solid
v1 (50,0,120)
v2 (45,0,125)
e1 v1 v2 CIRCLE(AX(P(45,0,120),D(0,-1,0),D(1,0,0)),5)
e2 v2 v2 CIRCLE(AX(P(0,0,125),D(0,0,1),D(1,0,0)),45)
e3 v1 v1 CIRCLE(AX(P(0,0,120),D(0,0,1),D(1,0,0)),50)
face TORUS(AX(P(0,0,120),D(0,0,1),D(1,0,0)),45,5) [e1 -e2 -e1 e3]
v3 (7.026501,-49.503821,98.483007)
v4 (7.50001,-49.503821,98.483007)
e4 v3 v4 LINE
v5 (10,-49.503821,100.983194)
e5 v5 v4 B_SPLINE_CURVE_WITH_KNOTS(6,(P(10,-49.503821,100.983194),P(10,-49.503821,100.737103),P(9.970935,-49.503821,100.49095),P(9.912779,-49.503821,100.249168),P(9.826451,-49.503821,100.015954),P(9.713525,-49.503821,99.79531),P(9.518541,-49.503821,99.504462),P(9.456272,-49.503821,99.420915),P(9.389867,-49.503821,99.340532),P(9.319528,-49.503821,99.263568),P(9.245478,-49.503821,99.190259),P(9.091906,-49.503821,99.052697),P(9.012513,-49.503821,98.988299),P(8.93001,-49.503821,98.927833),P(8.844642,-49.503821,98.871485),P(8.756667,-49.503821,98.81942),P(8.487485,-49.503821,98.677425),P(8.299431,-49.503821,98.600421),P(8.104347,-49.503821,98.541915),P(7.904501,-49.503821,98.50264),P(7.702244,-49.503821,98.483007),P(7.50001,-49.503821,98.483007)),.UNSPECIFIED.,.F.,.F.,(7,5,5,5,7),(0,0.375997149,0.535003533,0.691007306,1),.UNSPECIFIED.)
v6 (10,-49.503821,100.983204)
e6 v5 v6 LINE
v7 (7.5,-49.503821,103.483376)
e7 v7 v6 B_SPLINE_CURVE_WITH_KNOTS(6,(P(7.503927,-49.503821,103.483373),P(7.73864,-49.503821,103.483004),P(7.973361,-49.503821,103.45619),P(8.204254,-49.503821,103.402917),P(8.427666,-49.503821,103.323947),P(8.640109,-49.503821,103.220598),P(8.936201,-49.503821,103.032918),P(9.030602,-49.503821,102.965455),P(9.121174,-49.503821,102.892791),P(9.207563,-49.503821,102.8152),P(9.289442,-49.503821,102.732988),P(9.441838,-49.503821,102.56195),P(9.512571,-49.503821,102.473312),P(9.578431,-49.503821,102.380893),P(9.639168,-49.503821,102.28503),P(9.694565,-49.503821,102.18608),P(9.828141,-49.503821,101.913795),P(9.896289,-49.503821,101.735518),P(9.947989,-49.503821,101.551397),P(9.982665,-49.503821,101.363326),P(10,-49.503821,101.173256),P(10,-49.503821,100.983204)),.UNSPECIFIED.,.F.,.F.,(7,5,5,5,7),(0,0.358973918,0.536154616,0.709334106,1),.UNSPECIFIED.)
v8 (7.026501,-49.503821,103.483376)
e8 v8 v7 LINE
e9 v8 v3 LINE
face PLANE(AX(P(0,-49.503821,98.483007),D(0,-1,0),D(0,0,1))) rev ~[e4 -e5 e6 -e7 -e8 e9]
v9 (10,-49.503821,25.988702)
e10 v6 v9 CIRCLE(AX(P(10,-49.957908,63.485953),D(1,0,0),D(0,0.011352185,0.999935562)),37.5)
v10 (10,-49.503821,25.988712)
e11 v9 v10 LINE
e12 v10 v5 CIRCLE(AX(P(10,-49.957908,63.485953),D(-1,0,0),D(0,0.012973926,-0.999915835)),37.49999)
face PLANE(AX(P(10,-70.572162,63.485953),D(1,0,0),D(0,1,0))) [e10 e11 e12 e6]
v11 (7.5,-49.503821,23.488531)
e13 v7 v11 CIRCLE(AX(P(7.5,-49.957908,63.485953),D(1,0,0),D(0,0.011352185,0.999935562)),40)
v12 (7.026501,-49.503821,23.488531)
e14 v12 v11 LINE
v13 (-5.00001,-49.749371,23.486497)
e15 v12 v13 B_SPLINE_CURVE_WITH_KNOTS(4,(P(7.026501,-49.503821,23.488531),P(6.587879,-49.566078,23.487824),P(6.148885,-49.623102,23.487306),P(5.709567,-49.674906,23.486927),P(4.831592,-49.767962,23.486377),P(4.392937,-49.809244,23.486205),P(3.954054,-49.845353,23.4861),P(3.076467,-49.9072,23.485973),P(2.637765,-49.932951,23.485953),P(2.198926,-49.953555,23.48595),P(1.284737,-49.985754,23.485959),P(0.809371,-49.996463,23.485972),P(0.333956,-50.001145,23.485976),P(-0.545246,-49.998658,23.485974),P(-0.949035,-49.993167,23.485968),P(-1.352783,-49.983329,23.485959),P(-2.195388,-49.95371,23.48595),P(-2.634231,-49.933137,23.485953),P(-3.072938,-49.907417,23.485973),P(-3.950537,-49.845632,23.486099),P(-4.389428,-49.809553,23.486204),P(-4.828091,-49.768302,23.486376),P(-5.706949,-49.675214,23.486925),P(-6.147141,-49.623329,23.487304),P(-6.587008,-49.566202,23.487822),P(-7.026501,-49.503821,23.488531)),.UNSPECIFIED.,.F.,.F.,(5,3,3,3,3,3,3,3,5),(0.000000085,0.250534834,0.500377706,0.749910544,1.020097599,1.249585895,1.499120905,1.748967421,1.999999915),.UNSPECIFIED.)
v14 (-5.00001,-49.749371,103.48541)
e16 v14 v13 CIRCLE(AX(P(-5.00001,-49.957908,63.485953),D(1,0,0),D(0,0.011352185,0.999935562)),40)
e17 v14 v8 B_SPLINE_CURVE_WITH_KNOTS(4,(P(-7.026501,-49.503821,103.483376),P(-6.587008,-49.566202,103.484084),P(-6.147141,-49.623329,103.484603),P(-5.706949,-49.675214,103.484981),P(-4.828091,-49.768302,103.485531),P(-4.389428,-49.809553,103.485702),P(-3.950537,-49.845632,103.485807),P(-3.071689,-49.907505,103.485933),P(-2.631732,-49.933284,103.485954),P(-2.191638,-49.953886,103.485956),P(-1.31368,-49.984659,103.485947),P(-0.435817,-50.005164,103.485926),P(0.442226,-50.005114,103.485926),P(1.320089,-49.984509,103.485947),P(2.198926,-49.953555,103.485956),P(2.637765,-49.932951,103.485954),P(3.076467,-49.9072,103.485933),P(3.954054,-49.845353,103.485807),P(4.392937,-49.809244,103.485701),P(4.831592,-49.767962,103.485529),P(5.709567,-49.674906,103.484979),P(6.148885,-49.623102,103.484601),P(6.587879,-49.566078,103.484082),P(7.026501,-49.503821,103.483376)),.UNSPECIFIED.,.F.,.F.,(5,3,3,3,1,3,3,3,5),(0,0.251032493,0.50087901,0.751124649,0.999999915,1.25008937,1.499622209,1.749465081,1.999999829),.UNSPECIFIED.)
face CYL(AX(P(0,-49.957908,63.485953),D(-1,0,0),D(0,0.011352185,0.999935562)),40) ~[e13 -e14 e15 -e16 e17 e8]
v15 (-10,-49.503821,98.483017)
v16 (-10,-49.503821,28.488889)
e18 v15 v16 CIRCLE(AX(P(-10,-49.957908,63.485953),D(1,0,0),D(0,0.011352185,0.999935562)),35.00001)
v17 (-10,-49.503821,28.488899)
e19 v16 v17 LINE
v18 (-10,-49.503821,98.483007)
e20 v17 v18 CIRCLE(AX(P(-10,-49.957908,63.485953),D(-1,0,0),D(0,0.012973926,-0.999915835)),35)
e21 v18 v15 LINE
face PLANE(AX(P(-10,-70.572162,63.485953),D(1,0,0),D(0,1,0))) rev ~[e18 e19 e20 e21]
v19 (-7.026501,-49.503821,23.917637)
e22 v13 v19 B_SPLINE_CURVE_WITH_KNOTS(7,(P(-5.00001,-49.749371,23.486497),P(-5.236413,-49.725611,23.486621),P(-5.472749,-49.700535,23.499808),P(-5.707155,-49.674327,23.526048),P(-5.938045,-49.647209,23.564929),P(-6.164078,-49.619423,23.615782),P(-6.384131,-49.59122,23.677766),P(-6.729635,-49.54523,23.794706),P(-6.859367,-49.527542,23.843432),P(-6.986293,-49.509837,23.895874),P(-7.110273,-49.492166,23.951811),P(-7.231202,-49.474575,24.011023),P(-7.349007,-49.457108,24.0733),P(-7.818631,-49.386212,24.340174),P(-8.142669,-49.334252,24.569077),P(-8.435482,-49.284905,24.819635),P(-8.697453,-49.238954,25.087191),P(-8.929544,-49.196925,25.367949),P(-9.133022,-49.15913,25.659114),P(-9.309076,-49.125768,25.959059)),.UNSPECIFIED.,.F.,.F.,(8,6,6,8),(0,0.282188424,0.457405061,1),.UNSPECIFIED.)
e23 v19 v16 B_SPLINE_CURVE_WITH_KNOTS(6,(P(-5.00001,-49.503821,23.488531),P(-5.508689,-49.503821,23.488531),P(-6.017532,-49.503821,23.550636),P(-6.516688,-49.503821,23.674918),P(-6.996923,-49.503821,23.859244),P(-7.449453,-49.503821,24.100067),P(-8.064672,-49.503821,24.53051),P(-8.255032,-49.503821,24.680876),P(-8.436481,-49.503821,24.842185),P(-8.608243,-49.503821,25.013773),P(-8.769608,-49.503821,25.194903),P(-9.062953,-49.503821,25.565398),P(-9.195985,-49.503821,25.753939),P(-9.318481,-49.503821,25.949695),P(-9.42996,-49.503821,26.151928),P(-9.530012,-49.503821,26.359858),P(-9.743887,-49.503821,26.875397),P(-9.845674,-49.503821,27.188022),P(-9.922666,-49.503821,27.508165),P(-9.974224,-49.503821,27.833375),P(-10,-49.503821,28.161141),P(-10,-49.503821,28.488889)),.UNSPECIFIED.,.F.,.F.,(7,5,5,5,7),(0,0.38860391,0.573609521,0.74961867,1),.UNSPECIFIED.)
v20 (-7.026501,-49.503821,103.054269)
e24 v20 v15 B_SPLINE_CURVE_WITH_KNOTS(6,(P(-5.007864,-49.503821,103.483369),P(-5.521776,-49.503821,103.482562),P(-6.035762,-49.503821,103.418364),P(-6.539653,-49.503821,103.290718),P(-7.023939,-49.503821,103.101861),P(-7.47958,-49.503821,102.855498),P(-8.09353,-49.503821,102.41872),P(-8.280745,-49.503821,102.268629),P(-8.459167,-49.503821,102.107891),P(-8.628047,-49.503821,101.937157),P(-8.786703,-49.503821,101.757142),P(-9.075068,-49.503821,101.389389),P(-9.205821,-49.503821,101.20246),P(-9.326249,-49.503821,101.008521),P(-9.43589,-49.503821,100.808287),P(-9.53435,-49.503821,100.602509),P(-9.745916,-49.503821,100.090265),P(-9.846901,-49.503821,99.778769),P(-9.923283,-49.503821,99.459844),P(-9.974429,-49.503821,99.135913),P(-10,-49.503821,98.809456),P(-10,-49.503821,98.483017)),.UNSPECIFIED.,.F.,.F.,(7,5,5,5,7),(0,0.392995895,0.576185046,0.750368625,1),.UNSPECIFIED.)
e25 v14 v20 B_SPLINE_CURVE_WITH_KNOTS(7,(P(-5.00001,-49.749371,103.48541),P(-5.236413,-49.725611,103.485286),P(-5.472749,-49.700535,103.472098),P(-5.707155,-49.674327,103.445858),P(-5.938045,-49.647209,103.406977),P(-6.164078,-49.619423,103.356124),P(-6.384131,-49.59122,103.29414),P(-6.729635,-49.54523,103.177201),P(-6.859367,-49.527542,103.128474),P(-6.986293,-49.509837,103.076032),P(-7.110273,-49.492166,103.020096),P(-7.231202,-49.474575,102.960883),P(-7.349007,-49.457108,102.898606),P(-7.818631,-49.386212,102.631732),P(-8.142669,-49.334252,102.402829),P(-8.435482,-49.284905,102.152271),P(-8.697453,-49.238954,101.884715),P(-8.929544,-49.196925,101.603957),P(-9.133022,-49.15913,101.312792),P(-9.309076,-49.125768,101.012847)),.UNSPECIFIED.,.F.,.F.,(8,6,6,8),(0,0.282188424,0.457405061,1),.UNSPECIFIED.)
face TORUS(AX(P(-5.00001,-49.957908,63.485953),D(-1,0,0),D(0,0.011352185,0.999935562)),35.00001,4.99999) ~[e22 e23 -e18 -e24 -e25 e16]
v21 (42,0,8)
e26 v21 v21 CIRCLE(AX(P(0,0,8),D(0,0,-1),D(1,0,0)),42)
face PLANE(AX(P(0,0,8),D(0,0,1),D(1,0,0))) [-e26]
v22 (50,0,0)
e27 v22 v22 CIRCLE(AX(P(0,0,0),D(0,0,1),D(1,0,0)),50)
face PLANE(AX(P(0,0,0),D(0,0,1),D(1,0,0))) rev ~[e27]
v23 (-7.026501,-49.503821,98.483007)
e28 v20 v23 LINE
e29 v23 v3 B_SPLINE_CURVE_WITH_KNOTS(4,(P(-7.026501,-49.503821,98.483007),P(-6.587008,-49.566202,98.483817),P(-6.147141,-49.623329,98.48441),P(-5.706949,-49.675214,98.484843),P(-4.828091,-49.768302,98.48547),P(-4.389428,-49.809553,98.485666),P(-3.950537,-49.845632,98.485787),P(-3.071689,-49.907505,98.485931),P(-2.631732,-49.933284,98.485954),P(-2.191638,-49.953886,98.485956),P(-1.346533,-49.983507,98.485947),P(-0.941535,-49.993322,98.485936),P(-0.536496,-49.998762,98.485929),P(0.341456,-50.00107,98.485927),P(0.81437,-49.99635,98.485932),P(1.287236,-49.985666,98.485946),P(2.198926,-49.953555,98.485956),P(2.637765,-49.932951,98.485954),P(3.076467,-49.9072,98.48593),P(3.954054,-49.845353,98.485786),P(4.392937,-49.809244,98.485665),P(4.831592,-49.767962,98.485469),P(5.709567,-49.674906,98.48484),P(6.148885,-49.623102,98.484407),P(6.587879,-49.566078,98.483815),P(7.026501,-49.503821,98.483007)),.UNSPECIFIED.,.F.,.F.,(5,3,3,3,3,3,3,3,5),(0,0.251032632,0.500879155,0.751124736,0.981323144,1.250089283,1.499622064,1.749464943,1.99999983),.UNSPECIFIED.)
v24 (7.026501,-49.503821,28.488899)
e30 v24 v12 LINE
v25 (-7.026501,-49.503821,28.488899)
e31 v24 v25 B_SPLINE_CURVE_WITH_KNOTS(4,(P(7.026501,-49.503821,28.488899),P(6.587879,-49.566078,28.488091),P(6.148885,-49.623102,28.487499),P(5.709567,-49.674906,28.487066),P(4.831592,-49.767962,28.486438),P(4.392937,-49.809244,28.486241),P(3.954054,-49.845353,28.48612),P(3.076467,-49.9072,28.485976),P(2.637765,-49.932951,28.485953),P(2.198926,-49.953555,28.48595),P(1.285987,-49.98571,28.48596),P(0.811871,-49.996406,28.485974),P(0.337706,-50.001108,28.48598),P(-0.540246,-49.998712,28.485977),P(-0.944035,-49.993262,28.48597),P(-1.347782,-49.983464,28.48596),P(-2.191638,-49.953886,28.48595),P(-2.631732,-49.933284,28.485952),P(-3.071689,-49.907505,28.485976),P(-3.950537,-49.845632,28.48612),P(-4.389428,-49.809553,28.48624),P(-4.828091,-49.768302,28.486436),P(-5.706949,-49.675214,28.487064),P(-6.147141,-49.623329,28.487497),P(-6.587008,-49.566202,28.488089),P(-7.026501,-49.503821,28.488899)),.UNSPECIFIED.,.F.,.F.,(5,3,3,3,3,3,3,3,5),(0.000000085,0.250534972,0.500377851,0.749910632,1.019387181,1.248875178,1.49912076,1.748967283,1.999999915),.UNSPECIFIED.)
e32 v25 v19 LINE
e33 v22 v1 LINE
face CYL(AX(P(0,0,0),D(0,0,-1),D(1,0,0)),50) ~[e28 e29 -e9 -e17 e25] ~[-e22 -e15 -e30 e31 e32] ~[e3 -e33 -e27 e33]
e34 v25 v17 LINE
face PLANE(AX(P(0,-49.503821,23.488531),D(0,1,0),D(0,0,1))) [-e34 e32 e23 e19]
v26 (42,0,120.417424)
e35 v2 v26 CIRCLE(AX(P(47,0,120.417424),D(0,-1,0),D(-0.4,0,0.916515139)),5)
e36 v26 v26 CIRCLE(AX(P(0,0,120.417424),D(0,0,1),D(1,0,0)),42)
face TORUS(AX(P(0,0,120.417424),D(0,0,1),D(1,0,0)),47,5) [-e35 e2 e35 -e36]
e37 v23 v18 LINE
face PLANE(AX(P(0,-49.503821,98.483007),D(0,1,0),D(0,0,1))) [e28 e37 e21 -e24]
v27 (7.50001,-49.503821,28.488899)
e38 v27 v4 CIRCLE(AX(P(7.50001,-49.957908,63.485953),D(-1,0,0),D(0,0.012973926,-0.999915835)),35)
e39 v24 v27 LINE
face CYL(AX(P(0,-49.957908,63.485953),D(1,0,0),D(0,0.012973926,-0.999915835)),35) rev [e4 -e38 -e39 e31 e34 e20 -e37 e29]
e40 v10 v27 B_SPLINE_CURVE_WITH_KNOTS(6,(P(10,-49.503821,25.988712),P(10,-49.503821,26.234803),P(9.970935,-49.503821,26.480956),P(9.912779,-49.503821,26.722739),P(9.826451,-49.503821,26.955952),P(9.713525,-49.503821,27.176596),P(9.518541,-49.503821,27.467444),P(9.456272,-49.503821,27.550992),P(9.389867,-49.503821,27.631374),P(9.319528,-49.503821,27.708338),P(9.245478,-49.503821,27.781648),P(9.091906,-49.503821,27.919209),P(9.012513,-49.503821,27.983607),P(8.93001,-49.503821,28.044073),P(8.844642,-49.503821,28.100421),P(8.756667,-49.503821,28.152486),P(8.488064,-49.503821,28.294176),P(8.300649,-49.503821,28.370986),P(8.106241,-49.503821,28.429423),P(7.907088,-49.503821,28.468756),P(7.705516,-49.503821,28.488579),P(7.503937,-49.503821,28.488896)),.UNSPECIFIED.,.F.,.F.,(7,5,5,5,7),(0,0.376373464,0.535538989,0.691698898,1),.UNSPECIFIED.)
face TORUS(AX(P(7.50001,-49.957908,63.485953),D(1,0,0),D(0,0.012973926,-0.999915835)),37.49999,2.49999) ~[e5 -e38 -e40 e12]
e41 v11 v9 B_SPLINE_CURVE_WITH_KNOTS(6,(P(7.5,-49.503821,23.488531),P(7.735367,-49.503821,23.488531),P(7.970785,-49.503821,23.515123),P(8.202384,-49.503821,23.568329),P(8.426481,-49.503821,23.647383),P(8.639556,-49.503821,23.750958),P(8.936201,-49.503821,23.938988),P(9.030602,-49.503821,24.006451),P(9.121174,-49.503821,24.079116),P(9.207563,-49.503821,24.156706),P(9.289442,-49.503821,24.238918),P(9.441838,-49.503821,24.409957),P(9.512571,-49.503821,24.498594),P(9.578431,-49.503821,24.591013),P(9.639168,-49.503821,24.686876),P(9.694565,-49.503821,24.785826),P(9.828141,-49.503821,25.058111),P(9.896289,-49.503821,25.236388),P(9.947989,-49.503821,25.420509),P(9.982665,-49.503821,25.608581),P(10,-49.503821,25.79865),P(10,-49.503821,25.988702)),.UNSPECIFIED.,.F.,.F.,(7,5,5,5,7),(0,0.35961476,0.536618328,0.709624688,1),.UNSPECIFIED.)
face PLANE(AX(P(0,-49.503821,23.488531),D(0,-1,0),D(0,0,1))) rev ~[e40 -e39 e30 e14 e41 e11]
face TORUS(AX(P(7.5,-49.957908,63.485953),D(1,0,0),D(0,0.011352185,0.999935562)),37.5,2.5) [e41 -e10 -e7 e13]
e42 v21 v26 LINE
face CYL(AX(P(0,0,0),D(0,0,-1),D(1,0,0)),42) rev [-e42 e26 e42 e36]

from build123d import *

# Parameters (mm, degrees)
F0_R          = 50
F1_DEPTH      = 125
F2_T          = -8
F3_R          = 5
F6_DEPTH      = 10
F6_DEPTH_BACK = 10
F7_R          = 2.5
F8_R          = 2.49999
F9_R          = 4.99999


# Not quite as in the source:
# - a fillet or chamfer that OpenCascade refuses, or shapes differently, is made with other operations: its cross-section is extruded or revolved along the edge and cut away or added
# - a fillet or chamfer is up to 0.001 mm smaller than in the source, because OpenCascade refuses the exact size


with BuildPart() as f1:
    # F0 (on Top) → F1 (new body)
    with BuildSketch(Plane.XY):
        Circle(F0_R)
    extrude(amount=F1_DEPTH)

    # F2
    f2_openings = [f1.faces().sort_by_distance(p)[0] for p in [
        (0, 0, 125),
    ]]
    offset(amount=F2_T, openings=f2_openings)

    # F3
    f3_edges = [f1.edges().sort_by_distance(p)[0] for p in [
        (-50, 0, 125),
    ]]
    fillet(f3_edges, radius=F3_R)

    # F4: fillet of radius 5 on 1 edges, made by hand

    # F4_s1 → F4_t2 (revolve, cut)
    with BuildSketch(Plane.XZ):
        with BuildLine():
            ThreePointArc((45, 125), (42.8166998673, 123.1560370926), (42, 120.417424305))
            Line((42, 120.417424305), (42, 125))
            Line((42, 125), (45, 125))
        make_face()
    revolve(axis=Axis((0, 0, 125), (0, 0, 1)), mode=Mode.SUBTRACT)

    # F5 (on Right) → F6 (join, two sides)
    with BuildSketch(Plane.YZ) as f6_sk:
        with BuildLine():
            ThreePointArc((-49.5038208311, 28.4888988916), (-84.9579082425, 63.4859531194), (-49.5038208311, 98.4830073472))
            Line((-49.5038208311, 98.4830073472), (-49.5038208311, 103.4833755941))
            ThreePointArc((-49.5038208311, 103.4833755941), (-89.9579082425, 63.4859531194), (-49.5038208311, 23.4885306446))
            Line((-49.5038208311, 23.4885306446), (-49.5038208311, 28.4888988916))
        make_face()
    extrude(amount=F6_DEPTH)
    extrude(f6_sk.sketch, amount=-F6_DEPTH_BACK)

    # F7
    f7_edges = [f1.edges().sort_by_distance(p)[0] for p in [
        (10, -89.957908, 63.485953),
    ]]
    fillet(f7_edges, radius=F7_R)

    # F8 (radius 2.5 in the source; OpenCascade refuses exactly that, so slightly less here)
    f8_edges = [f1.edges().sort_by_distance(p)[0] for p in [
        (10, -84.957908, 63.485953),
    ]]
    fillet(f8_edges, radius=F8_R)

    # F9 (radius 5 in the source; OpenCascade refuses exactly that, so slightly less here)
    f9_edges = [f1.edges().sort_by_distance(p)[0] for p in [
        (-10, -89.957908, 63.485953),
    ]]
    fillet(f9_edges, radius=F9_R)


solid = f1.part
